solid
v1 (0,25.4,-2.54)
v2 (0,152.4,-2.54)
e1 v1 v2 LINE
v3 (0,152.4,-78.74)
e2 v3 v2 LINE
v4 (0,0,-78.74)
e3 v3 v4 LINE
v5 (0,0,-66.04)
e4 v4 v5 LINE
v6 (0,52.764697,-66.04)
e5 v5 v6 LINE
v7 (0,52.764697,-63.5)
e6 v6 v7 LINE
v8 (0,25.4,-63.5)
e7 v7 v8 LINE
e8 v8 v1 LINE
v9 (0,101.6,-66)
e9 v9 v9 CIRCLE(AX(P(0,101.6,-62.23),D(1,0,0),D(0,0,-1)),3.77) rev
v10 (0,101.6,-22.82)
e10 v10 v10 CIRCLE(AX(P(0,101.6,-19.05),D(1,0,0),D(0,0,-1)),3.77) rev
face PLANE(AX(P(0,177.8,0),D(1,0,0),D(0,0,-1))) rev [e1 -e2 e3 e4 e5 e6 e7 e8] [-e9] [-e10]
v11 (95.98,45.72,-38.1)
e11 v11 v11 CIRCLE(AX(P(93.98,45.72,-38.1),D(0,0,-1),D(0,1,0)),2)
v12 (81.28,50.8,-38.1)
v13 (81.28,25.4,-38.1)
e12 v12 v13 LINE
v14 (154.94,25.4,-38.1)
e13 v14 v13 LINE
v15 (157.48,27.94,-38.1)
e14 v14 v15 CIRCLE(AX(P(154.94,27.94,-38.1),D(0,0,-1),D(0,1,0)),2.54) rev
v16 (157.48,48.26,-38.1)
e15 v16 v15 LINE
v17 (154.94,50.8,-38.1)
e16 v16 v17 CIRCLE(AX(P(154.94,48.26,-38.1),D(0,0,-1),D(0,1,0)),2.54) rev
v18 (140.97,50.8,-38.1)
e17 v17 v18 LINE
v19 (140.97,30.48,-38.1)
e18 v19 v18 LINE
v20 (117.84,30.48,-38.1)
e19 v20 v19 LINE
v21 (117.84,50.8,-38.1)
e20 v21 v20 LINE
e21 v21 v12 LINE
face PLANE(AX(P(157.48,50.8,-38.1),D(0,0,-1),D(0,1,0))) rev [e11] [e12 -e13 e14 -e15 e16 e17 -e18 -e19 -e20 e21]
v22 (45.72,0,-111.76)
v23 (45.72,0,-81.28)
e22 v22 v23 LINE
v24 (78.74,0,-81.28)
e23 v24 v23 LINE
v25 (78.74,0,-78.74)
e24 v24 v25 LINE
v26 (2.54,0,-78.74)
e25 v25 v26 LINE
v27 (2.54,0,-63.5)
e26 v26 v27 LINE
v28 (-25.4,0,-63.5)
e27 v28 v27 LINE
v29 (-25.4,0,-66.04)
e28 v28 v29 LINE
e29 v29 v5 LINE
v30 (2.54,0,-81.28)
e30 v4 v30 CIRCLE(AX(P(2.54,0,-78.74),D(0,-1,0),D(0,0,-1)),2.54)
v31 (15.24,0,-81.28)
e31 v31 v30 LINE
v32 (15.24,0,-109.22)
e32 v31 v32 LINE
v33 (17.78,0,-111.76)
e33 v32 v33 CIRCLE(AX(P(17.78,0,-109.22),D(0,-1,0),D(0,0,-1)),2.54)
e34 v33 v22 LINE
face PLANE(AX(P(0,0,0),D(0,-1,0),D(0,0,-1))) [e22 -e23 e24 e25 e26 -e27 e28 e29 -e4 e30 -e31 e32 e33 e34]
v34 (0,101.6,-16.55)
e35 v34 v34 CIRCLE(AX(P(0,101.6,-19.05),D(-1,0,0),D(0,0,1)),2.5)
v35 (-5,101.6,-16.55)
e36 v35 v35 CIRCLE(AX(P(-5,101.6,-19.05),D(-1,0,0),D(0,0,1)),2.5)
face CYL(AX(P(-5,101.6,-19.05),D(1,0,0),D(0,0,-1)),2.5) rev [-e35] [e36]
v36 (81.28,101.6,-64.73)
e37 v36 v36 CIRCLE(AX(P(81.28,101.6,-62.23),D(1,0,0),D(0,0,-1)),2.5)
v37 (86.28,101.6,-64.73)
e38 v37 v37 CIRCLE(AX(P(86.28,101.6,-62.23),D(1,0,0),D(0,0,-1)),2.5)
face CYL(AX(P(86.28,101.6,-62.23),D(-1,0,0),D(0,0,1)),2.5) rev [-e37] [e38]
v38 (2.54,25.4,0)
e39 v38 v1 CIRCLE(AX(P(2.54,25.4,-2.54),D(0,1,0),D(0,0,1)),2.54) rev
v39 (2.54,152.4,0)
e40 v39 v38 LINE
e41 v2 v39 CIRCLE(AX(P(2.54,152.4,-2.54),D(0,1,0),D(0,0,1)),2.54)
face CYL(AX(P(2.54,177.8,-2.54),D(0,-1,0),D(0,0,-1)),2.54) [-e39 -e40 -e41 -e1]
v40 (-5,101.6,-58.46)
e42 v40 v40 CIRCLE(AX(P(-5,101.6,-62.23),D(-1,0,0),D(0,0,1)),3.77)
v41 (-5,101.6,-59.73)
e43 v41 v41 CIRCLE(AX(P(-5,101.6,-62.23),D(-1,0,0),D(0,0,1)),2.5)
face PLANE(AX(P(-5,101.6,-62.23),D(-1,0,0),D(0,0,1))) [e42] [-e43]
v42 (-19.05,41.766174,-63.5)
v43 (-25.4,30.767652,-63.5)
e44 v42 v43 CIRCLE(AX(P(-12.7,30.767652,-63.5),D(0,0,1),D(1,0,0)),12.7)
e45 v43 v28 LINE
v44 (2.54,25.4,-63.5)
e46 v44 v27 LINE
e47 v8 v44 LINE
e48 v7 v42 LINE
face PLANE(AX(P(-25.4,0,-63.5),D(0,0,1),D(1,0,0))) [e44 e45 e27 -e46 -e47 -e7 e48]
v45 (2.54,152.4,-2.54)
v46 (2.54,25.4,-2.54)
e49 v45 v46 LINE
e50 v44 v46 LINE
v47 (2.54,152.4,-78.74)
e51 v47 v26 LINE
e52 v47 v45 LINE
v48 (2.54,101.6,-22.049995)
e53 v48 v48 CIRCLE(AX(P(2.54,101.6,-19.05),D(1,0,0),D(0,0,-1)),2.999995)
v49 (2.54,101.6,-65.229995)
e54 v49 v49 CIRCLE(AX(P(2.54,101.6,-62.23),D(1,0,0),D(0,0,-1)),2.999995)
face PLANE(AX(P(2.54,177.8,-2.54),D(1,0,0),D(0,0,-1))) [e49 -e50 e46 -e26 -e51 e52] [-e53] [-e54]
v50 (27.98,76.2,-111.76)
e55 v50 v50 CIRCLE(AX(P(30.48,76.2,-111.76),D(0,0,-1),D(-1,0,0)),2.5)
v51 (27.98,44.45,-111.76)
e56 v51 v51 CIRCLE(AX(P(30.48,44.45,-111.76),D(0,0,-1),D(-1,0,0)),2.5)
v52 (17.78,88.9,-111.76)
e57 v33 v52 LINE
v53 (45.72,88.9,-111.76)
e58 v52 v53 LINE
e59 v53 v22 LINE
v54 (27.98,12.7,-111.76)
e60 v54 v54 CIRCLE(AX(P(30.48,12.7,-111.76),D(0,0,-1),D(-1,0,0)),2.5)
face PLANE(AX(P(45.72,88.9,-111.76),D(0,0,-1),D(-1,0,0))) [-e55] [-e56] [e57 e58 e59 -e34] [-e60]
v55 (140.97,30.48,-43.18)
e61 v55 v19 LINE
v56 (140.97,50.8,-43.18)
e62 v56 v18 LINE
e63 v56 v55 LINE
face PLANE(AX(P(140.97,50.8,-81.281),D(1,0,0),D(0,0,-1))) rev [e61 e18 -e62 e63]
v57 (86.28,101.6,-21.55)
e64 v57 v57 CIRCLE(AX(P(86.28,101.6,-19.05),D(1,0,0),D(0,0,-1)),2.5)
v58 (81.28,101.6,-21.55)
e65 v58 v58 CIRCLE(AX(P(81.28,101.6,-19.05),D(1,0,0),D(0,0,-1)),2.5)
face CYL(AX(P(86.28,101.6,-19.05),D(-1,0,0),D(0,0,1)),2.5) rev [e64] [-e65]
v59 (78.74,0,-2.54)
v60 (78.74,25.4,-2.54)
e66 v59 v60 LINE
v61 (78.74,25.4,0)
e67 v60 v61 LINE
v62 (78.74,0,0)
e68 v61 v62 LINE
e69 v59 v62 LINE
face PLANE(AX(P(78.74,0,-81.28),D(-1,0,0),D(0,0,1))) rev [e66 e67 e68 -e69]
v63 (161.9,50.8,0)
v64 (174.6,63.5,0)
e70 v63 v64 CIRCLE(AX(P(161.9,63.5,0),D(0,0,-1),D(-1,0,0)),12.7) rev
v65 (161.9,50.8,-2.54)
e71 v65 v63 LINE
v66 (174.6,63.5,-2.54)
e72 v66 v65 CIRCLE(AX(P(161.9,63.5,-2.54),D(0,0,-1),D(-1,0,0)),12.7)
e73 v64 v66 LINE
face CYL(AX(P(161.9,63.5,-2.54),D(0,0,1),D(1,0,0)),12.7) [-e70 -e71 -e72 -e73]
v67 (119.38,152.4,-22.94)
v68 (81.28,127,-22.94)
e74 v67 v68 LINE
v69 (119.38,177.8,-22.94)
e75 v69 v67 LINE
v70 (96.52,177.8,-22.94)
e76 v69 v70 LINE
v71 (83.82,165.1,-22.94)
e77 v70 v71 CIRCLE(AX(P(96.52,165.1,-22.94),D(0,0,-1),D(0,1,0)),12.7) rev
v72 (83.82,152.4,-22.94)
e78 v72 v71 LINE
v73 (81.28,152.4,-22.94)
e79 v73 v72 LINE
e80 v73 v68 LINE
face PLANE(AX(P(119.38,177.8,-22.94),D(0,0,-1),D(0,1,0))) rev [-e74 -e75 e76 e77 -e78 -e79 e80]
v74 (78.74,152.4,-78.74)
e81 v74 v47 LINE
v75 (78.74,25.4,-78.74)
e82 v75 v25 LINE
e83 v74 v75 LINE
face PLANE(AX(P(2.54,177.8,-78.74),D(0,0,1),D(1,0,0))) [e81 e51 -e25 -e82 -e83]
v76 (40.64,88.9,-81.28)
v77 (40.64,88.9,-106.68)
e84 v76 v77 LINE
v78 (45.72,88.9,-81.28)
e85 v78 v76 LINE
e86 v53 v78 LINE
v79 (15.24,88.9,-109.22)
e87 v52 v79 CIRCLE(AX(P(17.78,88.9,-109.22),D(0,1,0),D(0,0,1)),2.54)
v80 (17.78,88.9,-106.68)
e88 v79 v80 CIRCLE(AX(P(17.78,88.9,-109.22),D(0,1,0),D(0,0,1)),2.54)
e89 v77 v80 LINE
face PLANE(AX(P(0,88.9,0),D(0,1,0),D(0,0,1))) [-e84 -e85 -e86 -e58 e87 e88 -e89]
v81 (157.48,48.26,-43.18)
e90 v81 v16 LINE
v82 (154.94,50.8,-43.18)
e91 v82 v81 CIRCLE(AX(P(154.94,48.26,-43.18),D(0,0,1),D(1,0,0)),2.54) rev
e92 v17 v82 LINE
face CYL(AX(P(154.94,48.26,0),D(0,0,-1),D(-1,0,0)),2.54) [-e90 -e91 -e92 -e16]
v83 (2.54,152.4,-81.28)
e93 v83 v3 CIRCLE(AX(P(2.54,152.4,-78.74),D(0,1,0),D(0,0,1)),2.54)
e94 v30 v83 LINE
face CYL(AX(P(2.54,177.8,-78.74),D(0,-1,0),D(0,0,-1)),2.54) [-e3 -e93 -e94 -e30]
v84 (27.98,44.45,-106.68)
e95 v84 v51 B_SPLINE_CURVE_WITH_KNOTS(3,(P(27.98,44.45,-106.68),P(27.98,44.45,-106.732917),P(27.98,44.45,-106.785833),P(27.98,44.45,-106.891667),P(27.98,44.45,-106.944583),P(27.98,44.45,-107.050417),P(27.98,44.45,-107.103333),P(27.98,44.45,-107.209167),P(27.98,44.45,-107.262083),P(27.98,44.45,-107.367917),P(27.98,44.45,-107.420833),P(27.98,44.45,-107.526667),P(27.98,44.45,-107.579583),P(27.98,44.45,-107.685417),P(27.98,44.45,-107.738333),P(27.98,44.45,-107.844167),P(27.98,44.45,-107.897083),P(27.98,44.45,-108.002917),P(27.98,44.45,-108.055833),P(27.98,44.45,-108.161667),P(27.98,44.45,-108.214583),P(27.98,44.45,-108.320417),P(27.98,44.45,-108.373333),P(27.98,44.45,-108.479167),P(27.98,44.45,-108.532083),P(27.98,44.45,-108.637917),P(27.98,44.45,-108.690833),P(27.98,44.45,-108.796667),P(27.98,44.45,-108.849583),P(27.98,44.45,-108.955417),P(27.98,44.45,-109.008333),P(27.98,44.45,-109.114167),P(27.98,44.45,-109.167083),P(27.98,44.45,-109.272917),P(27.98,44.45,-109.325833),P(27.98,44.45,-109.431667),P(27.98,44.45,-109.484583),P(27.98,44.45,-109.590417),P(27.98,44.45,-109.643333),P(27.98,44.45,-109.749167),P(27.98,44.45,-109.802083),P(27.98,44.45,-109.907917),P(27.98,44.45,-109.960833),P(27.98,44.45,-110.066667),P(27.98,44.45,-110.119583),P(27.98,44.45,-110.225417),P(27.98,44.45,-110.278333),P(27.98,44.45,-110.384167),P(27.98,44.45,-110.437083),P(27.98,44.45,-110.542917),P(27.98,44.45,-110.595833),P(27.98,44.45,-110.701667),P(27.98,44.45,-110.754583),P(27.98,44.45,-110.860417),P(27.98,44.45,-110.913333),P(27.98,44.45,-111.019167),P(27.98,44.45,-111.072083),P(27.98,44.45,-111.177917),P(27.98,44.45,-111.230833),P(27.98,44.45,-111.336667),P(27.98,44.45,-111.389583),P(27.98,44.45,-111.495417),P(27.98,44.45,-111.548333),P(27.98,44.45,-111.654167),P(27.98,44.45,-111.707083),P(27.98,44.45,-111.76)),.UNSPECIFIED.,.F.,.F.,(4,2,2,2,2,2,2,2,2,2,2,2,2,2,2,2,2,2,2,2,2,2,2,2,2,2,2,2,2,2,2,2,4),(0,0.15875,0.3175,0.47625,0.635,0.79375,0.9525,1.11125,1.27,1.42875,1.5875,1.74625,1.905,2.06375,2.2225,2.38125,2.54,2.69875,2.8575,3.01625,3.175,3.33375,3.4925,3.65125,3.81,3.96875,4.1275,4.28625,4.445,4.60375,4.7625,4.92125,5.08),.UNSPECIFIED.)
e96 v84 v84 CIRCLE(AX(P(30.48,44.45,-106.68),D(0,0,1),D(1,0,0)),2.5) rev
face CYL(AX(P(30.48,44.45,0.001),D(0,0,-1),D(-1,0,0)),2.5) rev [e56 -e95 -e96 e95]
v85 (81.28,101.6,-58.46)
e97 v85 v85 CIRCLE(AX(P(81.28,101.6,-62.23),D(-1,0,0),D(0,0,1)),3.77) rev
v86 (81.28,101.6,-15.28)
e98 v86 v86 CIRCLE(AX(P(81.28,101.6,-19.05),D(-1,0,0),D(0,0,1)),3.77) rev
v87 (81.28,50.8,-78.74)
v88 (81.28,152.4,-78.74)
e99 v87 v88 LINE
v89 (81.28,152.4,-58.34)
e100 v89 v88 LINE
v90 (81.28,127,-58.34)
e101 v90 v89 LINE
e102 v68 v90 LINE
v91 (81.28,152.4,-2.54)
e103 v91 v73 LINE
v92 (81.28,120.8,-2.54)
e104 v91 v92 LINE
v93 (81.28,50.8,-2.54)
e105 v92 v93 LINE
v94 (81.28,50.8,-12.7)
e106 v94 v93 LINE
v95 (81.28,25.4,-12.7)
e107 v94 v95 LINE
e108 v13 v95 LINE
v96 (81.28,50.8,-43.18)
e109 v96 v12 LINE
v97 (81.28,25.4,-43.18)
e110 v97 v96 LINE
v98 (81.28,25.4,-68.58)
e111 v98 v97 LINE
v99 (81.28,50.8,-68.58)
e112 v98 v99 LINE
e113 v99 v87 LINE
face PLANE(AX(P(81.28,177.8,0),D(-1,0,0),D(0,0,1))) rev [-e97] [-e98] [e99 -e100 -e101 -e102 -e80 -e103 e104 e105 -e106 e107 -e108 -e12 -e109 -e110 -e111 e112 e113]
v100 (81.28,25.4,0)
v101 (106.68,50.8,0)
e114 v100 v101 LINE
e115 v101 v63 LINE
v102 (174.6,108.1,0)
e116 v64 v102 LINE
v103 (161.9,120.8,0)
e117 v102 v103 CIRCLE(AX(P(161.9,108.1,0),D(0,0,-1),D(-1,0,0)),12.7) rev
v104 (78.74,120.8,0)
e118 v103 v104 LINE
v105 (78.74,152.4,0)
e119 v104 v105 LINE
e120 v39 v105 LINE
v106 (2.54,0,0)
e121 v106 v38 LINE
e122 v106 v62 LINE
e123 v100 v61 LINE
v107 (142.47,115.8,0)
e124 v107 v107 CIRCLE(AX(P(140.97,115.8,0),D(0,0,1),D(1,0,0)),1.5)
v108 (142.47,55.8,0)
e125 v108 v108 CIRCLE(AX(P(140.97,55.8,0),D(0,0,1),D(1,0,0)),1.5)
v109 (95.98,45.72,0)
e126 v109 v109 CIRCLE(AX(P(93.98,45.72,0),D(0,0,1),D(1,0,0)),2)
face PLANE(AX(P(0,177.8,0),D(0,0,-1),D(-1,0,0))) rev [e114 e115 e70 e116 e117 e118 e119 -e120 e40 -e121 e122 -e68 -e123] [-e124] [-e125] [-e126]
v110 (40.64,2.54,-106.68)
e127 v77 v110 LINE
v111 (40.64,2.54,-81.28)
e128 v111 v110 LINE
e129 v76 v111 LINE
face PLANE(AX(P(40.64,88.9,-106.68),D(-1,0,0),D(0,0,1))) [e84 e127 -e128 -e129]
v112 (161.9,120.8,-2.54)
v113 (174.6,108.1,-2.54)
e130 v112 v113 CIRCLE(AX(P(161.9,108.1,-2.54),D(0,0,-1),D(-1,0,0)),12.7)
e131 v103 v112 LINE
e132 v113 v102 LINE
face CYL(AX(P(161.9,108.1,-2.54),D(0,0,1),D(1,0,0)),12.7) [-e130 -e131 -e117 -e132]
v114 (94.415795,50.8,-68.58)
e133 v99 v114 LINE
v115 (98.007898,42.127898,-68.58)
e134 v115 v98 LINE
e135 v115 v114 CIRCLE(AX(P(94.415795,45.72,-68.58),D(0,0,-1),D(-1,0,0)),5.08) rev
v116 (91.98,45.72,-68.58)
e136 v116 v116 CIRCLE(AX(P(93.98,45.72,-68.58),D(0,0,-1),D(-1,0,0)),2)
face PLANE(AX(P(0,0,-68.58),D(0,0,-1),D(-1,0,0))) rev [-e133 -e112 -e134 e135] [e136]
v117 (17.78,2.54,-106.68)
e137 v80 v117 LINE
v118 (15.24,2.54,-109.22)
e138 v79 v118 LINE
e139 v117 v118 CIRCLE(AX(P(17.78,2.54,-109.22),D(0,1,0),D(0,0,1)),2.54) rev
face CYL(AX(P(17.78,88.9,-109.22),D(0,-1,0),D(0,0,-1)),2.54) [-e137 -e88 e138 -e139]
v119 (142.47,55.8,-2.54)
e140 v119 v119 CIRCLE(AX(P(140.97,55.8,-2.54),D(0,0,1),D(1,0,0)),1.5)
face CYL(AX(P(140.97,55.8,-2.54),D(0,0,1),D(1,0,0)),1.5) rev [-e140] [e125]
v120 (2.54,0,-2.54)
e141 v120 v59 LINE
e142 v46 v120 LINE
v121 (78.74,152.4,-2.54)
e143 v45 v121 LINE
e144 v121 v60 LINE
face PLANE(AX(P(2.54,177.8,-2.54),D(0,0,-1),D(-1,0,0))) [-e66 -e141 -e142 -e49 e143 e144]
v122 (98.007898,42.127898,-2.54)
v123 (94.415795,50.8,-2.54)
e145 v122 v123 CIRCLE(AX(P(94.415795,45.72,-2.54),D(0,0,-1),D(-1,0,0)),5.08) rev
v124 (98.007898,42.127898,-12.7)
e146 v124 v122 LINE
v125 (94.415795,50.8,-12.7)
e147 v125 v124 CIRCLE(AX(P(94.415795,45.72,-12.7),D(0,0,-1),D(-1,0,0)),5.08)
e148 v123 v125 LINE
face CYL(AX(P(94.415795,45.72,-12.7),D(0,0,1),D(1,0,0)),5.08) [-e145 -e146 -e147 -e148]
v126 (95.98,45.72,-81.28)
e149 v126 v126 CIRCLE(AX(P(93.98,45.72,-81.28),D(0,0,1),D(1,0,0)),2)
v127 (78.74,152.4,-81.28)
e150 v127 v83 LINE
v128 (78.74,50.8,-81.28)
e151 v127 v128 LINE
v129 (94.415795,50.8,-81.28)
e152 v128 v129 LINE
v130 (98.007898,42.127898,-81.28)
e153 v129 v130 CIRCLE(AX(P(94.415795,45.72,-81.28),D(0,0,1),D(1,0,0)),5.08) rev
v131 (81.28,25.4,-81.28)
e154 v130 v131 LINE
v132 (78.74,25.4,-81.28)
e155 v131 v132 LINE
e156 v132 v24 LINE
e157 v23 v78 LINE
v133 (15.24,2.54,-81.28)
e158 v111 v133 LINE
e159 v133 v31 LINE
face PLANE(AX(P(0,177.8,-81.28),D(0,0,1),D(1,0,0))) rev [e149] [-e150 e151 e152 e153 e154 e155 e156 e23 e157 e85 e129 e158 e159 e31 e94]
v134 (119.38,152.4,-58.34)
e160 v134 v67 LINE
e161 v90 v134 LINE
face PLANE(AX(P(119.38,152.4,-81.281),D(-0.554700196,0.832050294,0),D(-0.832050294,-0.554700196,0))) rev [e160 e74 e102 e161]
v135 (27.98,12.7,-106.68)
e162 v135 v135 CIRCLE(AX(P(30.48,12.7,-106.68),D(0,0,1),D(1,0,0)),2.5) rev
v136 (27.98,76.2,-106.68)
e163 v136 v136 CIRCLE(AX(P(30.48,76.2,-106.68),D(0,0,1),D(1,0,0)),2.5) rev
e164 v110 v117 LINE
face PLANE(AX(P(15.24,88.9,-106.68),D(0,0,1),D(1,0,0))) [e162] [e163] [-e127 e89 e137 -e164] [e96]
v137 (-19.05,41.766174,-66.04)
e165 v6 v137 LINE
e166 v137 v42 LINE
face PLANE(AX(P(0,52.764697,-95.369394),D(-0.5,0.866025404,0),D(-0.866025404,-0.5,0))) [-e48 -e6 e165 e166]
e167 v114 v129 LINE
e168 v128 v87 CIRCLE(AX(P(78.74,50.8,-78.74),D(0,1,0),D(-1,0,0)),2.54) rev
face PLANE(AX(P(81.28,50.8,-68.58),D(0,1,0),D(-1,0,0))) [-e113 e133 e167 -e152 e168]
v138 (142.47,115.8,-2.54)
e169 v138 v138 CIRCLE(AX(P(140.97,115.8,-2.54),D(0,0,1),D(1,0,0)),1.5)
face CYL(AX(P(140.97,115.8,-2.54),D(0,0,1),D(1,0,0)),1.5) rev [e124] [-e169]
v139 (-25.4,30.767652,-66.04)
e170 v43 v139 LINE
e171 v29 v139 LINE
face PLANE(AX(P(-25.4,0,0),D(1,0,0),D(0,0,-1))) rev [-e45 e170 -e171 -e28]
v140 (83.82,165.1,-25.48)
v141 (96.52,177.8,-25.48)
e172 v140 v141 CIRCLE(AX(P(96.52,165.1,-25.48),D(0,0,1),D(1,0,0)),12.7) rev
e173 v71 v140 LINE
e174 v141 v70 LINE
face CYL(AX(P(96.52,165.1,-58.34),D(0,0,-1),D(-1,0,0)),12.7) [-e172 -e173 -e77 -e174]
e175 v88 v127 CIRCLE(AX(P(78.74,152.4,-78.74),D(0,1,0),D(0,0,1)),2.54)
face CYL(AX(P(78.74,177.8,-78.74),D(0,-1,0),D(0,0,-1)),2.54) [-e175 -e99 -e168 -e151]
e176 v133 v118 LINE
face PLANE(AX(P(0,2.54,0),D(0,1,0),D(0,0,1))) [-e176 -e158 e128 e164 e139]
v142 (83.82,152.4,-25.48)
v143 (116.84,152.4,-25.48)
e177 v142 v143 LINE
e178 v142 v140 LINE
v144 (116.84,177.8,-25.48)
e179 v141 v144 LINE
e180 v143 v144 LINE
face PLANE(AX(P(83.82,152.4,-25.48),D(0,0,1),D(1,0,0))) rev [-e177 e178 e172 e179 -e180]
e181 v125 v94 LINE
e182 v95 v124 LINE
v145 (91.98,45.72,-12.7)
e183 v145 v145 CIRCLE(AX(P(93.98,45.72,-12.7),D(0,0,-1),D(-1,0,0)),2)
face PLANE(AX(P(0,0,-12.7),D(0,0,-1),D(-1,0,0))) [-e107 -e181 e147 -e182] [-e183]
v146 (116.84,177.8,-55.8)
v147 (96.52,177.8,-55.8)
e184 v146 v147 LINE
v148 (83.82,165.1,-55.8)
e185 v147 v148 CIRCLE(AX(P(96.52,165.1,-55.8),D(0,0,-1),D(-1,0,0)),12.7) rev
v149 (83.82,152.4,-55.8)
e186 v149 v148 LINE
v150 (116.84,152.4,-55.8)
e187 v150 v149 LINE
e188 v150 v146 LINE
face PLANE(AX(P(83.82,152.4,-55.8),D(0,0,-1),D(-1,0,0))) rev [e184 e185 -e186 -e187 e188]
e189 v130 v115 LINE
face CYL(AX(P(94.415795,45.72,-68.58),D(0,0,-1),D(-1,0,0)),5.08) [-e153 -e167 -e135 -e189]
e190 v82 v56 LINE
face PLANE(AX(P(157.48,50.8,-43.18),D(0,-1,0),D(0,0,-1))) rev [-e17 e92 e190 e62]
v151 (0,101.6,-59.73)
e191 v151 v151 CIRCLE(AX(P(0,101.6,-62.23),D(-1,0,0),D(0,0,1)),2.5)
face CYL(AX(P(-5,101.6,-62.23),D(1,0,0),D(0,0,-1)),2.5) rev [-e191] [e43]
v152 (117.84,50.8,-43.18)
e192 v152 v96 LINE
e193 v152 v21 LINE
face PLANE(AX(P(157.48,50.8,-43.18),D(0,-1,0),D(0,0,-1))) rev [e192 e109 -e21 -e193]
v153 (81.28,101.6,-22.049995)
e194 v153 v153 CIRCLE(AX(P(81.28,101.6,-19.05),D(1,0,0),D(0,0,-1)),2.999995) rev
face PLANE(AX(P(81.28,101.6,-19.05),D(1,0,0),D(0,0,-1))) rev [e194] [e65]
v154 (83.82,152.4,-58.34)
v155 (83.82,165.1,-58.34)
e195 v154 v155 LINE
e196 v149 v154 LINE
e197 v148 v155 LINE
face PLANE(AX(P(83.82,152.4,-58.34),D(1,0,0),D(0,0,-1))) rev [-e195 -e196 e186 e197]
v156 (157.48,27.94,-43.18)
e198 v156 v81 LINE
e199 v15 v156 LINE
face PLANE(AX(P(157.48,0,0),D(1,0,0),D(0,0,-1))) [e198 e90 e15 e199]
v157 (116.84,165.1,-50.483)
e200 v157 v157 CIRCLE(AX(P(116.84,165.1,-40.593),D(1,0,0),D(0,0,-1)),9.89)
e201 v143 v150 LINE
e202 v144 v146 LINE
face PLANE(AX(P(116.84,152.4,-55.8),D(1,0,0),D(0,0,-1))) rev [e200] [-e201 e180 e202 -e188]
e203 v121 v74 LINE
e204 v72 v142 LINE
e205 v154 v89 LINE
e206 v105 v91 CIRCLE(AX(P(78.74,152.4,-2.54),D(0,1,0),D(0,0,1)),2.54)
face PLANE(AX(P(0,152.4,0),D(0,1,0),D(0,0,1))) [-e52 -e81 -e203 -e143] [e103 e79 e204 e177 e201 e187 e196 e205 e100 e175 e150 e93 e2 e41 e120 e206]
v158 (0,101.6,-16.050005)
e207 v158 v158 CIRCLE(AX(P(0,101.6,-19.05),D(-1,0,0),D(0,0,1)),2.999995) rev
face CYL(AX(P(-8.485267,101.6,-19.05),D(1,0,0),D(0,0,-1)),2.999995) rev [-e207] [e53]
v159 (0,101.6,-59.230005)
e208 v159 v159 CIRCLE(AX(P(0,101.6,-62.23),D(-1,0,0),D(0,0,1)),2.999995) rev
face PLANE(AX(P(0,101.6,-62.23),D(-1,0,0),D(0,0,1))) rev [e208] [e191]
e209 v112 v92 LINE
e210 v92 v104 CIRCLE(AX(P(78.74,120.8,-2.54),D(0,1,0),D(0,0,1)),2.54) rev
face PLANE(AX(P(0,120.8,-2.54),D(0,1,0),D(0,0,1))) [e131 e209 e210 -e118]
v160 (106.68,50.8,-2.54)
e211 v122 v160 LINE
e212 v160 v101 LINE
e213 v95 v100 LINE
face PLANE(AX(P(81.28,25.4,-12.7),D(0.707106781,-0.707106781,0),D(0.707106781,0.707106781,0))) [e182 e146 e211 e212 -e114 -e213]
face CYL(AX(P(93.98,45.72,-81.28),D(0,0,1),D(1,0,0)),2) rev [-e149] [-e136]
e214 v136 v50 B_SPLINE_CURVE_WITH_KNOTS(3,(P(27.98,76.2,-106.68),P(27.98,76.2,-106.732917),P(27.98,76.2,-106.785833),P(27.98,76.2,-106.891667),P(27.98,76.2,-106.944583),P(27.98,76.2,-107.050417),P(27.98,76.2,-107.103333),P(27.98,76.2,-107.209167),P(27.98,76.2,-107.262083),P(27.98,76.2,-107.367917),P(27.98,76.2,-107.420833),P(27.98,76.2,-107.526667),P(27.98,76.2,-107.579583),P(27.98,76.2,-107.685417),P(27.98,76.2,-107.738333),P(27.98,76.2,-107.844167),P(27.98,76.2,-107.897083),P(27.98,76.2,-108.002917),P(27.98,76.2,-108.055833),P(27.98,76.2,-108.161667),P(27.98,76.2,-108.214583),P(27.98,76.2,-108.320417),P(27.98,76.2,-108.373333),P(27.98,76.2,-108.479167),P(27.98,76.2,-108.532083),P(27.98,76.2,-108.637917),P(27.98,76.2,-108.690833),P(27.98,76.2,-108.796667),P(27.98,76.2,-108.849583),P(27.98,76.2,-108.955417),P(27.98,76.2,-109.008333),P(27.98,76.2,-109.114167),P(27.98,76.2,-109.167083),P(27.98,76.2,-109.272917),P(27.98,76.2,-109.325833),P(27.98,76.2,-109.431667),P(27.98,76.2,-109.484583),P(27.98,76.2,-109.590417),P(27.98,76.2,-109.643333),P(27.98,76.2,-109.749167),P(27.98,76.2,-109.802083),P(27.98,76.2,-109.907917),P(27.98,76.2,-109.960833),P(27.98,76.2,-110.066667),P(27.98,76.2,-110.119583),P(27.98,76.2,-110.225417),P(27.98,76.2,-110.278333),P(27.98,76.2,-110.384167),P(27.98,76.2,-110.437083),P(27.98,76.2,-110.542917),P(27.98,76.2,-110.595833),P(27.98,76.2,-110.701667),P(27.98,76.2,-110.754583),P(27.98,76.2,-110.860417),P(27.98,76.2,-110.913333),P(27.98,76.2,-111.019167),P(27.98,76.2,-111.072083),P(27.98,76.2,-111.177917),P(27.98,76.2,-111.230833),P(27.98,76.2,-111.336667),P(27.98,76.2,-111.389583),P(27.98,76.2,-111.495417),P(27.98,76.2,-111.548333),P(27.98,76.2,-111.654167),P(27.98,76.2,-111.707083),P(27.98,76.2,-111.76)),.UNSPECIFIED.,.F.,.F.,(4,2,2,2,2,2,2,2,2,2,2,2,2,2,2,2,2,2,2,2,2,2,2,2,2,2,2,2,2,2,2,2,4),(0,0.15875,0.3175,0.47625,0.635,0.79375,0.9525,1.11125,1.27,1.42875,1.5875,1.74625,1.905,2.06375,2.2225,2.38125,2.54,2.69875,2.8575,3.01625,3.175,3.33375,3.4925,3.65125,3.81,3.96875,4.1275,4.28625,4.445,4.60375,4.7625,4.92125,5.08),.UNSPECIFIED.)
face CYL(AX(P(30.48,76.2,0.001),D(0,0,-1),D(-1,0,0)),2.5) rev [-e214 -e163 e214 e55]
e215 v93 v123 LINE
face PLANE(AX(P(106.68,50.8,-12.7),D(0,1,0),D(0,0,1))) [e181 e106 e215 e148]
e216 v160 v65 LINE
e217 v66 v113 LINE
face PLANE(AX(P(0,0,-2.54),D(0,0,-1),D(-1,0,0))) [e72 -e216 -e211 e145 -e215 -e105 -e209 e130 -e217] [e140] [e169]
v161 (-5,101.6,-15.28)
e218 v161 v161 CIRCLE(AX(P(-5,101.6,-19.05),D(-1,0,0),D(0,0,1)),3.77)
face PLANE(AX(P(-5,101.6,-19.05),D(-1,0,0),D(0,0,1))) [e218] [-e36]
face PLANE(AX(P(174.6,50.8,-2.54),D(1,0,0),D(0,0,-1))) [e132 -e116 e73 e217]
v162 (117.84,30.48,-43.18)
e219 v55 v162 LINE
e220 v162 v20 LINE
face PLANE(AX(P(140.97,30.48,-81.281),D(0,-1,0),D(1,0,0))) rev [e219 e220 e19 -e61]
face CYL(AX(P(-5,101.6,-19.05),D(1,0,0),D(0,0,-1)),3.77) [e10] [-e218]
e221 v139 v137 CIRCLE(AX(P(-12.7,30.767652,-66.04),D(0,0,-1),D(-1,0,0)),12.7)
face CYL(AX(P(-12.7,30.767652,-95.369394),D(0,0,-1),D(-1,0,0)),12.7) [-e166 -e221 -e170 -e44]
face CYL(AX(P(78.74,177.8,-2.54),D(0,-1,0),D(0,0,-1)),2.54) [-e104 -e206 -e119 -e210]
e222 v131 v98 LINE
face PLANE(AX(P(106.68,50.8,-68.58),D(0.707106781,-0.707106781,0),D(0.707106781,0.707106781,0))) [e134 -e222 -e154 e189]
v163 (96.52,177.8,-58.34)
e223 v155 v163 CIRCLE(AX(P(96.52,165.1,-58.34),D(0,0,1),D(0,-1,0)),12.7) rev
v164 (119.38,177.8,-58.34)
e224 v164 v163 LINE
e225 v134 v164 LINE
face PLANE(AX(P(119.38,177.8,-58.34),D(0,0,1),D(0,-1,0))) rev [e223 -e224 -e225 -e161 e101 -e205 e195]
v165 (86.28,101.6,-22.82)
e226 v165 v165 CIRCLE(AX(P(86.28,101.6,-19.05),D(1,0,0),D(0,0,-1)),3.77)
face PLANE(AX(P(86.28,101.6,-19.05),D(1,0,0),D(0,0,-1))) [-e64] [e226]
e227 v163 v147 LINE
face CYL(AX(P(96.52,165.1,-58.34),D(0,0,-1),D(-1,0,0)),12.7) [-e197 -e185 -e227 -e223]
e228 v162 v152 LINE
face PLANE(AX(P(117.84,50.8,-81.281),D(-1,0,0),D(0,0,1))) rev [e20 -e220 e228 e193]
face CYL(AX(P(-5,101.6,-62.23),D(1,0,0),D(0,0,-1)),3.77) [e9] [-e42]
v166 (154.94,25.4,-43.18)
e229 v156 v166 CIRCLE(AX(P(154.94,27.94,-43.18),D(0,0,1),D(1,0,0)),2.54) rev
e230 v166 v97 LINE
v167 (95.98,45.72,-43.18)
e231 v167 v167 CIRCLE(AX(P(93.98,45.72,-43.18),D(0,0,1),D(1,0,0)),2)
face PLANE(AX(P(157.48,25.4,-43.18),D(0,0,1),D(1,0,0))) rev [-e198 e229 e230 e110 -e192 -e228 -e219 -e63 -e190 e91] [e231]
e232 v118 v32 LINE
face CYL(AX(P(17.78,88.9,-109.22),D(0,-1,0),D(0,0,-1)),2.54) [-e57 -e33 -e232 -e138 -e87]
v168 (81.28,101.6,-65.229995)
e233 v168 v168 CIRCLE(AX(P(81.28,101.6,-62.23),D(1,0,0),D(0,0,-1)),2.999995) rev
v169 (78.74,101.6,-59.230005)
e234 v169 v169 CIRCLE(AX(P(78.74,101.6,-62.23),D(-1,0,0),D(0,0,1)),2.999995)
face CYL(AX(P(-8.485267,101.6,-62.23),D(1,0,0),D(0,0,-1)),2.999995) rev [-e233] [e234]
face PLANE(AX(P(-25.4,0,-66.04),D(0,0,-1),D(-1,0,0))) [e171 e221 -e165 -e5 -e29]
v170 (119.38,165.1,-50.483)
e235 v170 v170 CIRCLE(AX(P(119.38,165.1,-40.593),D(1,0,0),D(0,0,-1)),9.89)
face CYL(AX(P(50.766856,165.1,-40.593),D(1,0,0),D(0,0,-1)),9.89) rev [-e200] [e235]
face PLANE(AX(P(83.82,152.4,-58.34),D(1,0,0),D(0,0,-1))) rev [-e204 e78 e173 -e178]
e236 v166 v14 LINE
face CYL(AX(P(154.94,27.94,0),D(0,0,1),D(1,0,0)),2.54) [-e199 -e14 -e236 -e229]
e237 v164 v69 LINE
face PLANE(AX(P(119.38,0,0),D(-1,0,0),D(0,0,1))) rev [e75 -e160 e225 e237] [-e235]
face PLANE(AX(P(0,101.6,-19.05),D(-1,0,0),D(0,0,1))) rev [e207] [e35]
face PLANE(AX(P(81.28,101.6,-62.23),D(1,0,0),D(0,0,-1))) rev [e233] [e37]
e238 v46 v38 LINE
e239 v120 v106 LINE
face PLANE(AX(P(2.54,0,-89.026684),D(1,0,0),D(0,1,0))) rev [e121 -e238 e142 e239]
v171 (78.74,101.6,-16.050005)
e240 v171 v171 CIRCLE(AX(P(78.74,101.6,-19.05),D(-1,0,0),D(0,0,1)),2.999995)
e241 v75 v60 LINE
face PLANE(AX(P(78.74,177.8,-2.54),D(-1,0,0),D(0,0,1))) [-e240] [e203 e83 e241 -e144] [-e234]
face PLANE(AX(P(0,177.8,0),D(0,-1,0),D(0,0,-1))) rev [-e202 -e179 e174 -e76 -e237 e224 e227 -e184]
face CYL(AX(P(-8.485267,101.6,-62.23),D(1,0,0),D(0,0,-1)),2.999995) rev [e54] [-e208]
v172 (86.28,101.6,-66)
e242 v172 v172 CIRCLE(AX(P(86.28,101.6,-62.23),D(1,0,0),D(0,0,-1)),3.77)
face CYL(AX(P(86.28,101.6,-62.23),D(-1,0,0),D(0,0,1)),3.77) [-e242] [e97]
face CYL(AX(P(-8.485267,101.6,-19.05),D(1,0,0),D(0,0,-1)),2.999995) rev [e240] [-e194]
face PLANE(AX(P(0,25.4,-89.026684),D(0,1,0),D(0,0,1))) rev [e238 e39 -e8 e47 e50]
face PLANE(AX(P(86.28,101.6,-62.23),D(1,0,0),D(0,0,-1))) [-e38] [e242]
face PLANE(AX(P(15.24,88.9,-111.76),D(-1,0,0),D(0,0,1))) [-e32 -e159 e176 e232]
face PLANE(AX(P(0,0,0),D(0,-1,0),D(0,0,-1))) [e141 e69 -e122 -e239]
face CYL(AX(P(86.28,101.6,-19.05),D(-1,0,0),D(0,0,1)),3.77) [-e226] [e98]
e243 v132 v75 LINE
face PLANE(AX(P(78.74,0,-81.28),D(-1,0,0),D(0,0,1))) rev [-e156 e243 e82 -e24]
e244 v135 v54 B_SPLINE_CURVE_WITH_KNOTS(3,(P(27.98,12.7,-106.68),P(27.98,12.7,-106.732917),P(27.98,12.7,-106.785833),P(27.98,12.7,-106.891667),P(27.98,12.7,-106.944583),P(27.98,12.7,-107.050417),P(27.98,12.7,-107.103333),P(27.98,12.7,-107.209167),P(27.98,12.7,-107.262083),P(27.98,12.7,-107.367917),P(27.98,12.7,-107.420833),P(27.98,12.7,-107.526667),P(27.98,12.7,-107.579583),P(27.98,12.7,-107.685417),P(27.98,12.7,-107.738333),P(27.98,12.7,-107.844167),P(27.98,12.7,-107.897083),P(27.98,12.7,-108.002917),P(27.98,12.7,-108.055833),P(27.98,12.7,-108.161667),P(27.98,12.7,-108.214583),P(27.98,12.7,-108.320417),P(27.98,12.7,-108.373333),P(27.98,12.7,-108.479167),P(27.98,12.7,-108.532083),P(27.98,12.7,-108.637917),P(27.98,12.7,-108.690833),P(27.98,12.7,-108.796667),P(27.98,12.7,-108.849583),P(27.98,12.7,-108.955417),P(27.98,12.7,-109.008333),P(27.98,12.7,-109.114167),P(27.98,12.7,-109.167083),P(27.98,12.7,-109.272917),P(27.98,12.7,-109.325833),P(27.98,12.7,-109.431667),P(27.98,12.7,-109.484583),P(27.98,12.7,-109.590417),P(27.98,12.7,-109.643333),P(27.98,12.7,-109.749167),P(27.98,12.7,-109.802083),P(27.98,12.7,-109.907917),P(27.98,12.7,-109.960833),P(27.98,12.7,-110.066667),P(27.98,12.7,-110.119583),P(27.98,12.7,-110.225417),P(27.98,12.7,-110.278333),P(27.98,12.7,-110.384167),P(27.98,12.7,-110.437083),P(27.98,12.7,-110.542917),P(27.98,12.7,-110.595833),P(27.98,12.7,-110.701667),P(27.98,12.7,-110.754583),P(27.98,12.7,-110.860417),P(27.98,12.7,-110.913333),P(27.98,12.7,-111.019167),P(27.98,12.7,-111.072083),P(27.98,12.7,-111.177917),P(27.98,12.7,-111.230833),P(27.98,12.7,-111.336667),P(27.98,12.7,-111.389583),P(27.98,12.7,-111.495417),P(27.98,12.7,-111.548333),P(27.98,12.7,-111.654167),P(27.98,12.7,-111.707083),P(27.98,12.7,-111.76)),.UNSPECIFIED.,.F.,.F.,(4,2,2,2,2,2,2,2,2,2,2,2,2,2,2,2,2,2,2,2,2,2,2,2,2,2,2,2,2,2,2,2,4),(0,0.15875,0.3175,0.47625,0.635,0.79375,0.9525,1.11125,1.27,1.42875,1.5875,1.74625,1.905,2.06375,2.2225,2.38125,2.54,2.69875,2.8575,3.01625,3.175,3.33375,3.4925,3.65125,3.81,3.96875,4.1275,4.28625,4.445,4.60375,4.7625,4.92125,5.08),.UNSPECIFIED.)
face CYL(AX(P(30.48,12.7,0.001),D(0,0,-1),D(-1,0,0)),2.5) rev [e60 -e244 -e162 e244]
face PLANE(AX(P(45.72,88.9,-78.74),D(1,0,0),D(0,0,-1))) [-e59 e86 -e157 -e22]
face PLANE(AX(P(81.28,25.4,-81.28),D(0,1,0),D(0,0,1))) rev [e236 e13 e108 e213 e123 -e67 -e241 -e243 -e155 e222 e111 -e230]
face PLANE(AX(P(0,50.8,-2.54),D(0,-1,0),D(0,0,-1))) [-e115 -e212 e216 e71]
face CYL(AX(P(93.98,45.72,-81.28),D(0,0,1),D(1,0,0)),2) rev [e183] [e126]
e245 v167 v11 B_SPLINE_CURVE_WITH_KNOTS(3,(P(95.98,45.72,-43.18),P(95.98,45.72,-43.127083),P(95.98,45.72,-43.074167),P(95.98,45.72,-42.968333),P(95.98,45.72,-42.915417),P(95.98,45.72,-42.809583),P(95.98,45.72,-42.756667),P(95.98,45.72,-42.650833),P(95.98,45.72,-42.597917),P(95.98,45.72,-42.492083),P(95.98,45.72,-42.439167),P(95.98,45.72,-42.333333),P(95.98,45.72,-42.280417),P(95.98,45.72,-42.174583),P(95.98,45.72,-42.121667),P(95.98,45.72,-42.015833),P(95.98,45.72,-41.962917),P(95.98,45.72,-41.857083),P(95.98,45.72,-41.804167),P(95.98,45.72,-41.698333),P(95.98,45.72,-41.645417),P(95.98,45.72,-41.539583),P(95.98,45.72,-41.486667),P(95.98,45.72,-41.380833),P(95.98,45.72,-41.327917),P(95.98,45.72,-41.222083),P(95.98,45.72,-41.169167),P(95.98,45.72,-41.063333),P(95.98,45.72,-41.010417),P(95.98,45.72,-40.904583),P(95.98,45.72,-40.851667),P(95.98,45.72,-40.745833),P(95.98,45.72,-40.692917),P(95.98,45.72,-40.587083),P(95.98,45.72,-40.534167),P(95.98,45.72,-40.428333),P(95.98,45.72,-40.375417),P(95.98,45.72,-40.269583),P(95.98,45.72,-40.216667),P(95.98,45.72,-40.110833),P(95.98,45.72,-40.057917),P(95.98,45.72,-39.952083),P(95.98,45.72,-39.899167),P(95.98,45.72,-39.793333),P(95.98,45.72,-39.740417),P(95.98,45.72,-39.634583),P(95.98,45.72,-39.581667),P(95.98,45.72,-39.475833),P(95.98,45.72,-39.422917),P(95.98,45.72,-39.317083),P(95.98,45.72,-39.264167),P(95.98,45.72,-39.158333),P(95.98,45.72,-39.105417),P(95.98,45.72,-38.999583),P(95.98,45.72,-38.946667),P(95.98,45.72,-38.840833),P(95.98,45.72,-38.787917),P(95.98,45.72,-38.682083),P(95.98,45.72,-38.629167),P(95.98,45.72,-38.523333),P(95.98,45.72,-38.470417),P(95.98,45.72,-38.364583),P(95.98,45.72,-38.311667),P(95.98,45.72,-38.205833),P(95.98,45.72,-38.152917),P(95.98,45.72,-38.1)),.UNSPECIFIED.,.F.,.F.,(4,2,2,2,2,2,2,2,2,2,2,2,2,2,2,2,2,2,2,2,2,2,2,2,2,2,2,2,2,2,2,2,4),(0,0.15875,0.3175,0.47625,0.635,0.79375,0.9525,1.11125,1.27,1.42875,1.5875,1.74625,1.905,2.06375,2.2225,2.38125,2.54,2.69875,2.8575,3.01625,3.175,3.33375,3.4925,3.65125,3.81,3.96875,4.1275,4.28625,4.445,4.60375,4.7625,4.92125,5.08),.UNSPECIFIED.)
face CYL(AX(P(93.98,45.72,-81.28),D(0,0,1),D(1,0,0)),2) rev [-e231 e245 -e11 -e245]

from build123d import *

# Parameters (mm, degrees)
SKETCH1_W            = 81.28
SKETCH1_H            = 81.28
SKETCH1_W_2          = 76.2
SKETCH1_H_2          = 76.2
BOSS_EXTRUDE1_DEPTH  = 177.8
SKETCH2_W            = 2.54
SKETCH2_H            = 38.1
BOSS_EXTRUDE2_DEPTH  = 25.4
SKETCH3_W            = 2.54
SKETCH3_H            = 25.4
CUT_EXTRUDE1_DEPTH   = 212.720846399
BOSS_EXTRUDE3_DEPTH  = 12.7
BOSS_EXTRUDE4_DEPTH  = 12.7
SKETCH14_W           = 5.08
SKETCH14_H           = 25.4
BOSS_EXTRUDE6_DEPTH  = 76.2
CUT_EXTRUDE2_REACH   = 243.407
SKETCH16_W           = 23.13
SKETCH16_H           = 20.32
SKETCH22_R           = 2
CUT_EXTRUDE6_DEPTH   = 252.036309724
SKETCH28_W           = 35.399999812
SKETCH28_H           = 50.8
BOSS_EXTRUDE7_DEPTH  = 38.1
CUT_EXTRUDE8_REACH   = 246.574
SKETCH32_W           = 33.02
SKETCH32_H           = 30.319999812
CUT_EXTRUDE9_DEPTH   = 25.4
CUT_EXTRUDE13_REACH  = 245.27
SKETCH34_R           = 9.890000016
BOSS_EXTRUDE9_DEPTH  = 2.54
SKETCH38_W           = 2.54
SKETCH38_H           = 25.4
CUT_EXTRUDE15_DEPTH  = 63.5
CUT_EXTRUDE17_REACH  = 224.71
SKETCH40_R           = 2.999995
SKETCH41_R           = 3.77
SKETCH41_R_2         = 2.5
BOSS_EXTRUDE10_DEPTH = 5
BOSS_EXTRUDE11_START = 5
SKETCH42_R           = 3.77
SKETCH42_R_2         = 2.5
BOSS_EXTRUDE11_DEPTH = 5
SKETCH43_W           = 76.2
SKETCH43_H           = 76.2
CUT_EXTRUDE20_DEPTH  = 25.4
SKETCH44_W           = 174.6
SKETCH44_H           = 70
SKETCH44_R           = 1.5
BOSS_EXTRUDE12_DEPTH = 2.54
FILLET1_R            = 5.08
FILLET2_R            = 12.7
FILLET3_R            = 2.54
FILLET7_R            = 12.7
FILLET9_R            = 12.7
BOSS_EXTRUDE20_DEPTH = 88.9
CUT_EXTRUDE21_REACH  = 275.109
SKETCH54_R           = 2.5
SKETCH55_W           = 30.48
SKETCH55_H           = 33.02
BOSS_EXTRUDE21_DEPTH = 2.54
FILLET12_R           = 2.54
FILLET13_R           = 2.54


with BuildPart() as part:
    # Sketch1 → Boss-Extrude1 (new body)
    with BuildSketch(Plane(origin=(0, 0, 0), x_dir=(1, 0, 0), z_dir=(0, 1, 0))):
        with Locations((40.64, 40.64)):
            Rectangle(SKETCH1_W, SKETCH1_H)
        with Locations((40.64, 40.64)):
            Rectangle(SKETCH1_W_2, SKETCH1_H_2, mode=Mode.SUBTRACT)
    extrude(amount=BOSS_EXTRUDE1_DEPTH)

    # Sketch2 → Boss-Extrude2 (add)
    with BuildSketch(Plane(origin=(0, 0, 0), x_dir=(0, 0, -1), z_dir=(1, 0, 0))):
        with Locations((64.77, 19.05)):
            Rectangle(SKETCH2_W, SKETCH2_H)
    extrude(amount=-BOSS_EXTRUDE2_DEPTH)

    # Sketch3 → Cut-Extrude1 (cut, through all)
    with BuildSketch(Plane.XY):
        with Locations((80.01, 12.7)):
            Rectangle(SKETCH3_W, SKETCH3_H)
    extrude(amount=-CUT_EXTRUDE1_DEPTH, mode=Mode.SUBTRACT)

    # Sketch7 → Boss-Extrude3 (add)
    with BuildSketch(Plane.XY):
        Polygon((81.28, 25.4), (106.68, 50.8), (81.28, 50.8), align=None)
    extrude(amount=-BOSS_EXTRUDE3_DEPTH)

    # Sketch10 → Boss-Extrude4 (add)
    with BuildSketch(Plane(origin=(0, 0, -81.28), x_dir=(-1, 0, 0), z_dir=(0, 0, -1))):
        Polygon((-81.28, 25.4), (-81.28, 50.8), (-106.68, 50.8), align=None)
    extrude(amount=-BOSS_EXTRUDE4_DEPTH)

    # Sketch14 → Boss-Extrude6 (add)
    with BuildSketch(Plane(origin=(81.28, 0, 0), x_dir=(0, 0, -1), z_dir=(1, 0, 0))):
        with Locations((40.64, 38.1)):
            Rectangle(SKETCH14_W, SKETCH14_H)
    extrude(amount=BOSS_EXTRUDE6_DEPTH)

    # Sketch16 → Cut-Extrude2 (cut, up to next)
    with BuildSketch(Plane.XY.offset(-38.1), mode=Mode.PRIVATE) as cut_extrude2_sk1:
        with Locations((129.405, 40.64)):
            Rectangle(SKETCH16_W, SKETCH16_H)
    cut_extrude2_tool1 = extrude(cut_extrude2_sk1.sketch, amount=-CUT_EXTRUDE2_REACH, mode=Mode.PRIVATE) & part.part
    add(cut_extrude2_tool1.solids().sort_by_distance((129.405, 40.64, -38.1))[0], mode=Mode.SUBTRACT)

    # Sketch22 → Cut-Extrude6 (cut, through all)
    with BuildSketch(Plane.XY):
        with Locations((93.98, 45.72)):
            Circle(SKETCH22_R)
    extrude(amount=-CUT_EXTRUDE6_DEPTH, mode=Mode.SUBTRACT)

    # Sketch28 → Boss-Extrude7 (add)
    with BuildSketch(Plane(origin=(81.28, 0, 0), x_dir=(0, 0, -1), z_dir=(1, 0, 0))):
        with Locations((40.64, 152.4)):
            Rectangle(SKETCH28_W, SKETCH28_H)
    extrude(amount=BOSS_EXTRUDE7_DEPTH)

    # Sketch30 → Cut-Extrude8 (cut, up to next)
    with BuildSketch(Plane.XY.offset(-22.940000094), mode=Mode.PRIVATE) as cut_extrude8_sk1:
        Polygon((81.28, 127), (119.38, 127), (119.38, 152.4), align=None)
    cut_extrude8_tool1 = extrude(cut_extrude8_sk1.sketch, amount=-CUT_EXTRUDE8_REACH, mode=Mode.PRIVATE) & part.part
    add(cut_extrude8_tool1.solids().sort_by_distance((106.68, 135.466667, -22.94))[0], mode=Mode.SUBTRACT)

    # Sketch32 → Cut-Extrude9 (cut)
    with BuildSketch(Plane(origin=(0, 177.8, 0), x_dir=(1, 0, 0), z_dir=(0, 1, 0))):
        with Locations((100.33, 40.64)):
            Rectangle(SKETCH32_W, SKETCH32_H)
    extrude(amount=-CUT_EXTRUDE9_DEPTH, mode=Mode.SUBTRACT)

    # Cut-Extrude13: up to this face of the body (flat: up to its plane)
    cut_extrude13_end = Plane(part.part.faces().sort_by_distance((78.74, 101.6, -40.64))[0])
    # Sketch34 → Cut-Extrude13 (cut, up to the picked face)
    with BuildSketch(Plane(origin=(119.38, 0, 0), x_dir=(0, 0, -1), z_dir=(1, 0, 0)), mode=Mode.PRIVATE) as cut_extrude13_sk1:
        with Locations(Location((40.593000094, 165.1, 0), (0, 0, 180))):
            Circle(SKETCH34_R)
    cut_extrude13_tool1 = split(extrude(cut_extrude13_sk1.sketch, amount=-CUT_EXTRUDE13_REACH, mode=Mode.PRIVATE), bisect_by=cut_extrude13_end, keep=Keep.BOTH, mode=Mode.PRIVATE)
    add(cut_extrude13_tool1.solids().sort_by(Axis((119.38, 165.1, -40.593), (-1, 0, 0)))[0], mode=Mode.SUBTRACT)

    # Sketch37 → Boss-Extrude9 (add)
    with BuildSketch(Plane.XY.offset(-63.5)):
        Polygon((-25.4, 38.1), (0, 38.1), (0, 52.764696837), align=None)
    extrude(amount=-BOSS_EXTRUDE9_DEPTH)

    # Sketch38 → Cut-Extrude15 (cut)
    with BuildSketch(Plane.XY):
        with Locations((1.27, 12.7)):
            Rectangle(SKETCH38_W, SKETCH38_H)
    extrude(amount=-CUT_EXTRUDE15_DEPTH, mode=Mode.SUBTRACT)

    # Cut-Extrude17: up to this face of the body (flat: up to its plane)
    cut_extrude17_end = Plane(part.part.faces().sort_by_distance((0, 99.23335202, -41.514066738))[0])
    # Sketch40 → Cut-Extrude17 (cut, up to the picked face)
    with BuildSketch(Plane(origin=(81.28, 0, 0), x_dir=(0, 0, -1), z_dir=(1, 0, 0)), mode=Mode.PRIVATE) as cut_extrude17_sk1:
        with Locations((19.05, 101.6)):
            Circle(SKETCH40_R)
    cut_extrude17_tool1 = split(extrude(cut_extrude17_sk1.sketch, amount=-CUT_EXTRUDE17_REACH, mode=Mode.PRIVATE), bisect_by=cut_extrude17_end, keep=Keep.BOTH, mode=Mode.PRIVATE)
    # Sketch40 → Cut-Extrude17 (cut, up to the picked face)
    with BuildSketch(Plane(origin=(81.28, 0, 0), x_dir=(0, 0, -1), z_dir=(1, 0, 0)), mode=Mode.PRIVATE) as cut_extrude17_sk2:
        with Locations((62.23, 101.6)):
            Circle(SKETCH40_R)
    cut_extrude17_tool2 = split(extrude(cut_extrude17_sk2.sketch, amount=-CUT_EXTRUDE17_REACH, mode=Mode.PRIVATE), bisect_by=cut_extrude17_end, keep=Keep.BOTH, mode=Mode.PRIVATE)
    add(cut_extrude17_tool1.solids().sort_by(Axis((81.28, 101.6, -19.05), (-1, 0, 0)))[0], mode=Mode.SUBTRACT)
    add(cut_extrude17_tool2.solids().sort_by(Axis((81.28, 101.6, -62.23), (-1, 0, 0)))[0], mode=Mode.SUBTRACT)

    # Sketch41 → Boss-Extrude10 (add)
    # profile 1 of 2: a face of its own
    with BuildSketch(Plane(origin=(81.28, 0, 0), x_dir=(0, 0, -1), z_dir=(1, 0, 0))):
        with Locations(Location((19.05, 101.6, 0), (0, 0, 180))):
            Circle(SKETCH41_R)
        with Locations((19.05, 101.6)):
            Circle(SKETCH41_R_2, mode=Mode.SUBTRACT)
    # profile 2 of 2: a face of its own
    with BuildSketch(Plane(origin=(81.28, 0, 0), x_dir=(0, 0, -1), z_dir=(1, 0, 0))):
        with Locations(Location((62.23, 101.6, 0), (0, 0, 180))):
            Circle(SKETCH41_R)
        with Locations((62.23, 101.6)):
            Circle(SKETCH41_R_2, mode=Mode.SUBTRACT)
    extrude(amount=BOSS_EXTRUDE10_DEPTH)

    # Sketch42 → Boss-Extrude11 (add)
    # profile 1 of 2: a face of its own
    with BuildSketch(Plane.ZY.offset(BOSS_EXTRUDE11_START)):
        with Locations((-62.23, 101.6)):
            Circle(SKETCH42_R)
        with Locations(Location((-62.23, 101.6, 0), (0, 0, 180))):
            Circle(SKETCH42_R_2, mode=Mode.SUBTRACT)
    # profile 2 of 2: a face of its own
    with BuildSketch(Plane.ZY.offset(BOSS_EXTRUDE11_START)):
        with Locations((-19.05, 101.6)):
            Circle(SKETCH42_R)
        with Locations(Location((-19.05, 101.6, 0), (0, 0, 180))):
            Circle(SKETCH42_R_2, mode=Mode.SUBTRACT)
    extrude(amount=-BOSS_EXTRUDE11_DEPTH)

    # Sketch43 → Cut-Extrude20 (cut)
    with BuildSketch(Plane(origin=(0, 177.8, 0), x_dir=(1, 0, 0), z_dir=(0, 1, 0))):
        Polygon((83.82, 58.339999906), (83.82, 22.940000094), (81.28, 22.940000094), (81.28, 0), (0, 0), (0, 81.28), (81.28, 81.28), (81.28, 58.339999906), align=None)
        with Locations((40.64, 40.64)):
            Rectangle(SKETCH43_W, SKETCH43_H, mode=Mode.SUBTRACT)
    extrude(amount=-CUT_EXTRUDE20_DEPTH, mode=Mode.SUBTRACT)

    # Sketch44 → Boss-Extrude12 (add)
    with BuildSketch(Plane.XY):
        with Locations((87.3, 85.8)):
            Rectangle(SKETCH44_W, SKETCH44_H)
        with Locations((140.97, 115.8)):
            Circle(SKETCH44_R, mode=Mode.SUBTRACT)
        with Locations((140.97, 55.8)):
            Circle(SKETCH44_R, mode=Mode.SUBTRACT)
    extrude(amount=-BOSS_EXTRUDE12_DEPTH)

    # Fillet1
    fillet1_edges = [part.edges().sort_by_distance(p)[0] for p in [
        (106.68, 50.8, -7.62),
        (106.68, 50.8, -74.93),
    ]]
    fillet(fillet1_edges, radius=FILLET1_R)

    # Fillet2
    fillet2_edges = [part.edges().sort_by_distance(p)[0] for p in [
        (174.6, 120.8, -1.27),
        (174.6, 50.8, -1.27),
    ]]
    fillet(fillet2_edges, radius=FILLET2_R)

    # Fillet3
    fillet3_edges = [part.edges().sort_by_distance(p)[0] for p in [
        (157.48, 50.8, -40.64),
        (157.48, 25.4, -40.64),
    ]]
    fillet(fillet3_edges, radius=FILLET3_R)

    # Fillet7
    fillet7_edges = [part.edges().sort_by_distance(p)[0] for p in [
        (-25.4, 38.1, -64.77),
    ]]
    fillet(fillet7_edges, radius=FILLET7_R)

    # Fillet9
    fillet9_edges = [part.edges().sort_by_distance(p)[0] for p in [
        (83.82, 177.8, -24.210000094),
        (83.82, 177.8, -57.069999906),
    ]]
    fillet(fillet9_edges, radius=FILLET9_R)

    # Sketch53 → Boss-Extrude20 (add)
    with BuildSketch(Plane(origin=(0, 0, 0), x_dir=(-1, 0, 0), z_dir=(0, -1, 0))):
        Polygon((-35.659105782, 81.28), (-35.659105782, 78.74), (-45.72, 78.74), (-45.72, 111.76), (-15.24, 111.76), (-15.24, 106.68), (-40.64, 106.68), (-40.64, 81.28), align=None)
    extrude(amount=-BOSS_EXTRUDE20_DEPTH)

    # Sketch54 → Cut-Extrude21 (cut, up to next)
    with BuildSketch(Plane(origin=(0, 0, -111.76), x_dir=(-1, 0, 0), z_dir=(0, 0, -1)), mode=Mode.PRIVATE) as cut_extrude21_sk1:
        with Locations((-30.48, 76.2)):
            Circle(SKETCH54_R)
    cut_extrude21_tool1 = extrude(cut_extrude21_sk1.sketch, amount=-CUT_EXTRUDE21_REACH, mode=Mode.PRIVATE) & part.part
    # Sketch54 → Cut-Extrude21 (cut, up to next)
    with BuildSketch(Plane(origin=(0, 0, -111.76), x_dir=(-1, 0, 0), z_dir=(0, 0, -1)), mode=Mode.PRIVATE) as cut_extrude21_sk2:
        with Locations((-30.48, 44.45)):
            Circle(SKETCH54_R)
    cut_extrude21_tool2 = extrude(cut_extrude21_sk2.sketch, amount=-CUT_EXTRUDE21_REACH, mode=Mode.PRIVATE) & part.part
    # Sketch54 → Cut-Extrude21 (cut, up to next)
    with BuildSketch(Plane(origin=(0, 0, -111.76), x_dir=(-1, 0, 0), z_dir=(0, 0, -1)), mode=Mode.PRIVATE) as cut_extrude21_sk3:
        with Locations((-30.48, 12.7)):
            Circle(SKETCH54_R)
    cut_extrude21_tool3 = extrude(cut_extrude21_sk3.sketch, amount=-CUT_EXTRUDE21_REACH, mode=Mode.PRIVATE) & part.part
    add(cut_extrude21_tool1.solids().sort_by_distance((30.48, 76.2, -111.76))[0], mode=Mode.SUBTRACT)
    add(cut_extrude21_tool2.solids().sort_by_distance((30.48, 44.45, -111.76))[0], mode=Mode.SUBTRACT)
    add(cut_extrude21_tool3.solids().sort_by_distance((30.48, 12.7, -111.76))[0], mode=Mode.SUBTRACT)

    # Sketch55 → Boss-Extrude21 (add)
    with BuildSketch(Plane(origin=(0, 0, 0), x_dir=(-1, 0, 0), z_dir=(0, -1, 0))):
        with Locations((-30.48, 95.25)):
            Rectangle(SKETCH55_W, SKETCH55_H)
    extrude(amount=-BOSS_EXTRUDE21_DEPTH)

    # Fillet12
    fillet12_edges = [part.edges().sort_by_distance(p)[0] for p in [
        (81.28, 136.6, 0),
        (81.28, 101.6, -81.28),
        (0, 76.2, -81.28),
        (0, 88.9, 0),
    ]]
    fillet(fillet12_edges, radius=FILLET12_R)

    # Fillet13
    fillet13_edges = [part.edges().sort_by_distance(p)[0] for p in [
        (15.24, 45.72, -106.68),
        (15.24, 44.45, -111.76),
    ]]
    fillet(fillet13_edges, radius=FILLET13_R - 0.0001)  # a hair under: the kernel refuses the full size


solid = part.part
